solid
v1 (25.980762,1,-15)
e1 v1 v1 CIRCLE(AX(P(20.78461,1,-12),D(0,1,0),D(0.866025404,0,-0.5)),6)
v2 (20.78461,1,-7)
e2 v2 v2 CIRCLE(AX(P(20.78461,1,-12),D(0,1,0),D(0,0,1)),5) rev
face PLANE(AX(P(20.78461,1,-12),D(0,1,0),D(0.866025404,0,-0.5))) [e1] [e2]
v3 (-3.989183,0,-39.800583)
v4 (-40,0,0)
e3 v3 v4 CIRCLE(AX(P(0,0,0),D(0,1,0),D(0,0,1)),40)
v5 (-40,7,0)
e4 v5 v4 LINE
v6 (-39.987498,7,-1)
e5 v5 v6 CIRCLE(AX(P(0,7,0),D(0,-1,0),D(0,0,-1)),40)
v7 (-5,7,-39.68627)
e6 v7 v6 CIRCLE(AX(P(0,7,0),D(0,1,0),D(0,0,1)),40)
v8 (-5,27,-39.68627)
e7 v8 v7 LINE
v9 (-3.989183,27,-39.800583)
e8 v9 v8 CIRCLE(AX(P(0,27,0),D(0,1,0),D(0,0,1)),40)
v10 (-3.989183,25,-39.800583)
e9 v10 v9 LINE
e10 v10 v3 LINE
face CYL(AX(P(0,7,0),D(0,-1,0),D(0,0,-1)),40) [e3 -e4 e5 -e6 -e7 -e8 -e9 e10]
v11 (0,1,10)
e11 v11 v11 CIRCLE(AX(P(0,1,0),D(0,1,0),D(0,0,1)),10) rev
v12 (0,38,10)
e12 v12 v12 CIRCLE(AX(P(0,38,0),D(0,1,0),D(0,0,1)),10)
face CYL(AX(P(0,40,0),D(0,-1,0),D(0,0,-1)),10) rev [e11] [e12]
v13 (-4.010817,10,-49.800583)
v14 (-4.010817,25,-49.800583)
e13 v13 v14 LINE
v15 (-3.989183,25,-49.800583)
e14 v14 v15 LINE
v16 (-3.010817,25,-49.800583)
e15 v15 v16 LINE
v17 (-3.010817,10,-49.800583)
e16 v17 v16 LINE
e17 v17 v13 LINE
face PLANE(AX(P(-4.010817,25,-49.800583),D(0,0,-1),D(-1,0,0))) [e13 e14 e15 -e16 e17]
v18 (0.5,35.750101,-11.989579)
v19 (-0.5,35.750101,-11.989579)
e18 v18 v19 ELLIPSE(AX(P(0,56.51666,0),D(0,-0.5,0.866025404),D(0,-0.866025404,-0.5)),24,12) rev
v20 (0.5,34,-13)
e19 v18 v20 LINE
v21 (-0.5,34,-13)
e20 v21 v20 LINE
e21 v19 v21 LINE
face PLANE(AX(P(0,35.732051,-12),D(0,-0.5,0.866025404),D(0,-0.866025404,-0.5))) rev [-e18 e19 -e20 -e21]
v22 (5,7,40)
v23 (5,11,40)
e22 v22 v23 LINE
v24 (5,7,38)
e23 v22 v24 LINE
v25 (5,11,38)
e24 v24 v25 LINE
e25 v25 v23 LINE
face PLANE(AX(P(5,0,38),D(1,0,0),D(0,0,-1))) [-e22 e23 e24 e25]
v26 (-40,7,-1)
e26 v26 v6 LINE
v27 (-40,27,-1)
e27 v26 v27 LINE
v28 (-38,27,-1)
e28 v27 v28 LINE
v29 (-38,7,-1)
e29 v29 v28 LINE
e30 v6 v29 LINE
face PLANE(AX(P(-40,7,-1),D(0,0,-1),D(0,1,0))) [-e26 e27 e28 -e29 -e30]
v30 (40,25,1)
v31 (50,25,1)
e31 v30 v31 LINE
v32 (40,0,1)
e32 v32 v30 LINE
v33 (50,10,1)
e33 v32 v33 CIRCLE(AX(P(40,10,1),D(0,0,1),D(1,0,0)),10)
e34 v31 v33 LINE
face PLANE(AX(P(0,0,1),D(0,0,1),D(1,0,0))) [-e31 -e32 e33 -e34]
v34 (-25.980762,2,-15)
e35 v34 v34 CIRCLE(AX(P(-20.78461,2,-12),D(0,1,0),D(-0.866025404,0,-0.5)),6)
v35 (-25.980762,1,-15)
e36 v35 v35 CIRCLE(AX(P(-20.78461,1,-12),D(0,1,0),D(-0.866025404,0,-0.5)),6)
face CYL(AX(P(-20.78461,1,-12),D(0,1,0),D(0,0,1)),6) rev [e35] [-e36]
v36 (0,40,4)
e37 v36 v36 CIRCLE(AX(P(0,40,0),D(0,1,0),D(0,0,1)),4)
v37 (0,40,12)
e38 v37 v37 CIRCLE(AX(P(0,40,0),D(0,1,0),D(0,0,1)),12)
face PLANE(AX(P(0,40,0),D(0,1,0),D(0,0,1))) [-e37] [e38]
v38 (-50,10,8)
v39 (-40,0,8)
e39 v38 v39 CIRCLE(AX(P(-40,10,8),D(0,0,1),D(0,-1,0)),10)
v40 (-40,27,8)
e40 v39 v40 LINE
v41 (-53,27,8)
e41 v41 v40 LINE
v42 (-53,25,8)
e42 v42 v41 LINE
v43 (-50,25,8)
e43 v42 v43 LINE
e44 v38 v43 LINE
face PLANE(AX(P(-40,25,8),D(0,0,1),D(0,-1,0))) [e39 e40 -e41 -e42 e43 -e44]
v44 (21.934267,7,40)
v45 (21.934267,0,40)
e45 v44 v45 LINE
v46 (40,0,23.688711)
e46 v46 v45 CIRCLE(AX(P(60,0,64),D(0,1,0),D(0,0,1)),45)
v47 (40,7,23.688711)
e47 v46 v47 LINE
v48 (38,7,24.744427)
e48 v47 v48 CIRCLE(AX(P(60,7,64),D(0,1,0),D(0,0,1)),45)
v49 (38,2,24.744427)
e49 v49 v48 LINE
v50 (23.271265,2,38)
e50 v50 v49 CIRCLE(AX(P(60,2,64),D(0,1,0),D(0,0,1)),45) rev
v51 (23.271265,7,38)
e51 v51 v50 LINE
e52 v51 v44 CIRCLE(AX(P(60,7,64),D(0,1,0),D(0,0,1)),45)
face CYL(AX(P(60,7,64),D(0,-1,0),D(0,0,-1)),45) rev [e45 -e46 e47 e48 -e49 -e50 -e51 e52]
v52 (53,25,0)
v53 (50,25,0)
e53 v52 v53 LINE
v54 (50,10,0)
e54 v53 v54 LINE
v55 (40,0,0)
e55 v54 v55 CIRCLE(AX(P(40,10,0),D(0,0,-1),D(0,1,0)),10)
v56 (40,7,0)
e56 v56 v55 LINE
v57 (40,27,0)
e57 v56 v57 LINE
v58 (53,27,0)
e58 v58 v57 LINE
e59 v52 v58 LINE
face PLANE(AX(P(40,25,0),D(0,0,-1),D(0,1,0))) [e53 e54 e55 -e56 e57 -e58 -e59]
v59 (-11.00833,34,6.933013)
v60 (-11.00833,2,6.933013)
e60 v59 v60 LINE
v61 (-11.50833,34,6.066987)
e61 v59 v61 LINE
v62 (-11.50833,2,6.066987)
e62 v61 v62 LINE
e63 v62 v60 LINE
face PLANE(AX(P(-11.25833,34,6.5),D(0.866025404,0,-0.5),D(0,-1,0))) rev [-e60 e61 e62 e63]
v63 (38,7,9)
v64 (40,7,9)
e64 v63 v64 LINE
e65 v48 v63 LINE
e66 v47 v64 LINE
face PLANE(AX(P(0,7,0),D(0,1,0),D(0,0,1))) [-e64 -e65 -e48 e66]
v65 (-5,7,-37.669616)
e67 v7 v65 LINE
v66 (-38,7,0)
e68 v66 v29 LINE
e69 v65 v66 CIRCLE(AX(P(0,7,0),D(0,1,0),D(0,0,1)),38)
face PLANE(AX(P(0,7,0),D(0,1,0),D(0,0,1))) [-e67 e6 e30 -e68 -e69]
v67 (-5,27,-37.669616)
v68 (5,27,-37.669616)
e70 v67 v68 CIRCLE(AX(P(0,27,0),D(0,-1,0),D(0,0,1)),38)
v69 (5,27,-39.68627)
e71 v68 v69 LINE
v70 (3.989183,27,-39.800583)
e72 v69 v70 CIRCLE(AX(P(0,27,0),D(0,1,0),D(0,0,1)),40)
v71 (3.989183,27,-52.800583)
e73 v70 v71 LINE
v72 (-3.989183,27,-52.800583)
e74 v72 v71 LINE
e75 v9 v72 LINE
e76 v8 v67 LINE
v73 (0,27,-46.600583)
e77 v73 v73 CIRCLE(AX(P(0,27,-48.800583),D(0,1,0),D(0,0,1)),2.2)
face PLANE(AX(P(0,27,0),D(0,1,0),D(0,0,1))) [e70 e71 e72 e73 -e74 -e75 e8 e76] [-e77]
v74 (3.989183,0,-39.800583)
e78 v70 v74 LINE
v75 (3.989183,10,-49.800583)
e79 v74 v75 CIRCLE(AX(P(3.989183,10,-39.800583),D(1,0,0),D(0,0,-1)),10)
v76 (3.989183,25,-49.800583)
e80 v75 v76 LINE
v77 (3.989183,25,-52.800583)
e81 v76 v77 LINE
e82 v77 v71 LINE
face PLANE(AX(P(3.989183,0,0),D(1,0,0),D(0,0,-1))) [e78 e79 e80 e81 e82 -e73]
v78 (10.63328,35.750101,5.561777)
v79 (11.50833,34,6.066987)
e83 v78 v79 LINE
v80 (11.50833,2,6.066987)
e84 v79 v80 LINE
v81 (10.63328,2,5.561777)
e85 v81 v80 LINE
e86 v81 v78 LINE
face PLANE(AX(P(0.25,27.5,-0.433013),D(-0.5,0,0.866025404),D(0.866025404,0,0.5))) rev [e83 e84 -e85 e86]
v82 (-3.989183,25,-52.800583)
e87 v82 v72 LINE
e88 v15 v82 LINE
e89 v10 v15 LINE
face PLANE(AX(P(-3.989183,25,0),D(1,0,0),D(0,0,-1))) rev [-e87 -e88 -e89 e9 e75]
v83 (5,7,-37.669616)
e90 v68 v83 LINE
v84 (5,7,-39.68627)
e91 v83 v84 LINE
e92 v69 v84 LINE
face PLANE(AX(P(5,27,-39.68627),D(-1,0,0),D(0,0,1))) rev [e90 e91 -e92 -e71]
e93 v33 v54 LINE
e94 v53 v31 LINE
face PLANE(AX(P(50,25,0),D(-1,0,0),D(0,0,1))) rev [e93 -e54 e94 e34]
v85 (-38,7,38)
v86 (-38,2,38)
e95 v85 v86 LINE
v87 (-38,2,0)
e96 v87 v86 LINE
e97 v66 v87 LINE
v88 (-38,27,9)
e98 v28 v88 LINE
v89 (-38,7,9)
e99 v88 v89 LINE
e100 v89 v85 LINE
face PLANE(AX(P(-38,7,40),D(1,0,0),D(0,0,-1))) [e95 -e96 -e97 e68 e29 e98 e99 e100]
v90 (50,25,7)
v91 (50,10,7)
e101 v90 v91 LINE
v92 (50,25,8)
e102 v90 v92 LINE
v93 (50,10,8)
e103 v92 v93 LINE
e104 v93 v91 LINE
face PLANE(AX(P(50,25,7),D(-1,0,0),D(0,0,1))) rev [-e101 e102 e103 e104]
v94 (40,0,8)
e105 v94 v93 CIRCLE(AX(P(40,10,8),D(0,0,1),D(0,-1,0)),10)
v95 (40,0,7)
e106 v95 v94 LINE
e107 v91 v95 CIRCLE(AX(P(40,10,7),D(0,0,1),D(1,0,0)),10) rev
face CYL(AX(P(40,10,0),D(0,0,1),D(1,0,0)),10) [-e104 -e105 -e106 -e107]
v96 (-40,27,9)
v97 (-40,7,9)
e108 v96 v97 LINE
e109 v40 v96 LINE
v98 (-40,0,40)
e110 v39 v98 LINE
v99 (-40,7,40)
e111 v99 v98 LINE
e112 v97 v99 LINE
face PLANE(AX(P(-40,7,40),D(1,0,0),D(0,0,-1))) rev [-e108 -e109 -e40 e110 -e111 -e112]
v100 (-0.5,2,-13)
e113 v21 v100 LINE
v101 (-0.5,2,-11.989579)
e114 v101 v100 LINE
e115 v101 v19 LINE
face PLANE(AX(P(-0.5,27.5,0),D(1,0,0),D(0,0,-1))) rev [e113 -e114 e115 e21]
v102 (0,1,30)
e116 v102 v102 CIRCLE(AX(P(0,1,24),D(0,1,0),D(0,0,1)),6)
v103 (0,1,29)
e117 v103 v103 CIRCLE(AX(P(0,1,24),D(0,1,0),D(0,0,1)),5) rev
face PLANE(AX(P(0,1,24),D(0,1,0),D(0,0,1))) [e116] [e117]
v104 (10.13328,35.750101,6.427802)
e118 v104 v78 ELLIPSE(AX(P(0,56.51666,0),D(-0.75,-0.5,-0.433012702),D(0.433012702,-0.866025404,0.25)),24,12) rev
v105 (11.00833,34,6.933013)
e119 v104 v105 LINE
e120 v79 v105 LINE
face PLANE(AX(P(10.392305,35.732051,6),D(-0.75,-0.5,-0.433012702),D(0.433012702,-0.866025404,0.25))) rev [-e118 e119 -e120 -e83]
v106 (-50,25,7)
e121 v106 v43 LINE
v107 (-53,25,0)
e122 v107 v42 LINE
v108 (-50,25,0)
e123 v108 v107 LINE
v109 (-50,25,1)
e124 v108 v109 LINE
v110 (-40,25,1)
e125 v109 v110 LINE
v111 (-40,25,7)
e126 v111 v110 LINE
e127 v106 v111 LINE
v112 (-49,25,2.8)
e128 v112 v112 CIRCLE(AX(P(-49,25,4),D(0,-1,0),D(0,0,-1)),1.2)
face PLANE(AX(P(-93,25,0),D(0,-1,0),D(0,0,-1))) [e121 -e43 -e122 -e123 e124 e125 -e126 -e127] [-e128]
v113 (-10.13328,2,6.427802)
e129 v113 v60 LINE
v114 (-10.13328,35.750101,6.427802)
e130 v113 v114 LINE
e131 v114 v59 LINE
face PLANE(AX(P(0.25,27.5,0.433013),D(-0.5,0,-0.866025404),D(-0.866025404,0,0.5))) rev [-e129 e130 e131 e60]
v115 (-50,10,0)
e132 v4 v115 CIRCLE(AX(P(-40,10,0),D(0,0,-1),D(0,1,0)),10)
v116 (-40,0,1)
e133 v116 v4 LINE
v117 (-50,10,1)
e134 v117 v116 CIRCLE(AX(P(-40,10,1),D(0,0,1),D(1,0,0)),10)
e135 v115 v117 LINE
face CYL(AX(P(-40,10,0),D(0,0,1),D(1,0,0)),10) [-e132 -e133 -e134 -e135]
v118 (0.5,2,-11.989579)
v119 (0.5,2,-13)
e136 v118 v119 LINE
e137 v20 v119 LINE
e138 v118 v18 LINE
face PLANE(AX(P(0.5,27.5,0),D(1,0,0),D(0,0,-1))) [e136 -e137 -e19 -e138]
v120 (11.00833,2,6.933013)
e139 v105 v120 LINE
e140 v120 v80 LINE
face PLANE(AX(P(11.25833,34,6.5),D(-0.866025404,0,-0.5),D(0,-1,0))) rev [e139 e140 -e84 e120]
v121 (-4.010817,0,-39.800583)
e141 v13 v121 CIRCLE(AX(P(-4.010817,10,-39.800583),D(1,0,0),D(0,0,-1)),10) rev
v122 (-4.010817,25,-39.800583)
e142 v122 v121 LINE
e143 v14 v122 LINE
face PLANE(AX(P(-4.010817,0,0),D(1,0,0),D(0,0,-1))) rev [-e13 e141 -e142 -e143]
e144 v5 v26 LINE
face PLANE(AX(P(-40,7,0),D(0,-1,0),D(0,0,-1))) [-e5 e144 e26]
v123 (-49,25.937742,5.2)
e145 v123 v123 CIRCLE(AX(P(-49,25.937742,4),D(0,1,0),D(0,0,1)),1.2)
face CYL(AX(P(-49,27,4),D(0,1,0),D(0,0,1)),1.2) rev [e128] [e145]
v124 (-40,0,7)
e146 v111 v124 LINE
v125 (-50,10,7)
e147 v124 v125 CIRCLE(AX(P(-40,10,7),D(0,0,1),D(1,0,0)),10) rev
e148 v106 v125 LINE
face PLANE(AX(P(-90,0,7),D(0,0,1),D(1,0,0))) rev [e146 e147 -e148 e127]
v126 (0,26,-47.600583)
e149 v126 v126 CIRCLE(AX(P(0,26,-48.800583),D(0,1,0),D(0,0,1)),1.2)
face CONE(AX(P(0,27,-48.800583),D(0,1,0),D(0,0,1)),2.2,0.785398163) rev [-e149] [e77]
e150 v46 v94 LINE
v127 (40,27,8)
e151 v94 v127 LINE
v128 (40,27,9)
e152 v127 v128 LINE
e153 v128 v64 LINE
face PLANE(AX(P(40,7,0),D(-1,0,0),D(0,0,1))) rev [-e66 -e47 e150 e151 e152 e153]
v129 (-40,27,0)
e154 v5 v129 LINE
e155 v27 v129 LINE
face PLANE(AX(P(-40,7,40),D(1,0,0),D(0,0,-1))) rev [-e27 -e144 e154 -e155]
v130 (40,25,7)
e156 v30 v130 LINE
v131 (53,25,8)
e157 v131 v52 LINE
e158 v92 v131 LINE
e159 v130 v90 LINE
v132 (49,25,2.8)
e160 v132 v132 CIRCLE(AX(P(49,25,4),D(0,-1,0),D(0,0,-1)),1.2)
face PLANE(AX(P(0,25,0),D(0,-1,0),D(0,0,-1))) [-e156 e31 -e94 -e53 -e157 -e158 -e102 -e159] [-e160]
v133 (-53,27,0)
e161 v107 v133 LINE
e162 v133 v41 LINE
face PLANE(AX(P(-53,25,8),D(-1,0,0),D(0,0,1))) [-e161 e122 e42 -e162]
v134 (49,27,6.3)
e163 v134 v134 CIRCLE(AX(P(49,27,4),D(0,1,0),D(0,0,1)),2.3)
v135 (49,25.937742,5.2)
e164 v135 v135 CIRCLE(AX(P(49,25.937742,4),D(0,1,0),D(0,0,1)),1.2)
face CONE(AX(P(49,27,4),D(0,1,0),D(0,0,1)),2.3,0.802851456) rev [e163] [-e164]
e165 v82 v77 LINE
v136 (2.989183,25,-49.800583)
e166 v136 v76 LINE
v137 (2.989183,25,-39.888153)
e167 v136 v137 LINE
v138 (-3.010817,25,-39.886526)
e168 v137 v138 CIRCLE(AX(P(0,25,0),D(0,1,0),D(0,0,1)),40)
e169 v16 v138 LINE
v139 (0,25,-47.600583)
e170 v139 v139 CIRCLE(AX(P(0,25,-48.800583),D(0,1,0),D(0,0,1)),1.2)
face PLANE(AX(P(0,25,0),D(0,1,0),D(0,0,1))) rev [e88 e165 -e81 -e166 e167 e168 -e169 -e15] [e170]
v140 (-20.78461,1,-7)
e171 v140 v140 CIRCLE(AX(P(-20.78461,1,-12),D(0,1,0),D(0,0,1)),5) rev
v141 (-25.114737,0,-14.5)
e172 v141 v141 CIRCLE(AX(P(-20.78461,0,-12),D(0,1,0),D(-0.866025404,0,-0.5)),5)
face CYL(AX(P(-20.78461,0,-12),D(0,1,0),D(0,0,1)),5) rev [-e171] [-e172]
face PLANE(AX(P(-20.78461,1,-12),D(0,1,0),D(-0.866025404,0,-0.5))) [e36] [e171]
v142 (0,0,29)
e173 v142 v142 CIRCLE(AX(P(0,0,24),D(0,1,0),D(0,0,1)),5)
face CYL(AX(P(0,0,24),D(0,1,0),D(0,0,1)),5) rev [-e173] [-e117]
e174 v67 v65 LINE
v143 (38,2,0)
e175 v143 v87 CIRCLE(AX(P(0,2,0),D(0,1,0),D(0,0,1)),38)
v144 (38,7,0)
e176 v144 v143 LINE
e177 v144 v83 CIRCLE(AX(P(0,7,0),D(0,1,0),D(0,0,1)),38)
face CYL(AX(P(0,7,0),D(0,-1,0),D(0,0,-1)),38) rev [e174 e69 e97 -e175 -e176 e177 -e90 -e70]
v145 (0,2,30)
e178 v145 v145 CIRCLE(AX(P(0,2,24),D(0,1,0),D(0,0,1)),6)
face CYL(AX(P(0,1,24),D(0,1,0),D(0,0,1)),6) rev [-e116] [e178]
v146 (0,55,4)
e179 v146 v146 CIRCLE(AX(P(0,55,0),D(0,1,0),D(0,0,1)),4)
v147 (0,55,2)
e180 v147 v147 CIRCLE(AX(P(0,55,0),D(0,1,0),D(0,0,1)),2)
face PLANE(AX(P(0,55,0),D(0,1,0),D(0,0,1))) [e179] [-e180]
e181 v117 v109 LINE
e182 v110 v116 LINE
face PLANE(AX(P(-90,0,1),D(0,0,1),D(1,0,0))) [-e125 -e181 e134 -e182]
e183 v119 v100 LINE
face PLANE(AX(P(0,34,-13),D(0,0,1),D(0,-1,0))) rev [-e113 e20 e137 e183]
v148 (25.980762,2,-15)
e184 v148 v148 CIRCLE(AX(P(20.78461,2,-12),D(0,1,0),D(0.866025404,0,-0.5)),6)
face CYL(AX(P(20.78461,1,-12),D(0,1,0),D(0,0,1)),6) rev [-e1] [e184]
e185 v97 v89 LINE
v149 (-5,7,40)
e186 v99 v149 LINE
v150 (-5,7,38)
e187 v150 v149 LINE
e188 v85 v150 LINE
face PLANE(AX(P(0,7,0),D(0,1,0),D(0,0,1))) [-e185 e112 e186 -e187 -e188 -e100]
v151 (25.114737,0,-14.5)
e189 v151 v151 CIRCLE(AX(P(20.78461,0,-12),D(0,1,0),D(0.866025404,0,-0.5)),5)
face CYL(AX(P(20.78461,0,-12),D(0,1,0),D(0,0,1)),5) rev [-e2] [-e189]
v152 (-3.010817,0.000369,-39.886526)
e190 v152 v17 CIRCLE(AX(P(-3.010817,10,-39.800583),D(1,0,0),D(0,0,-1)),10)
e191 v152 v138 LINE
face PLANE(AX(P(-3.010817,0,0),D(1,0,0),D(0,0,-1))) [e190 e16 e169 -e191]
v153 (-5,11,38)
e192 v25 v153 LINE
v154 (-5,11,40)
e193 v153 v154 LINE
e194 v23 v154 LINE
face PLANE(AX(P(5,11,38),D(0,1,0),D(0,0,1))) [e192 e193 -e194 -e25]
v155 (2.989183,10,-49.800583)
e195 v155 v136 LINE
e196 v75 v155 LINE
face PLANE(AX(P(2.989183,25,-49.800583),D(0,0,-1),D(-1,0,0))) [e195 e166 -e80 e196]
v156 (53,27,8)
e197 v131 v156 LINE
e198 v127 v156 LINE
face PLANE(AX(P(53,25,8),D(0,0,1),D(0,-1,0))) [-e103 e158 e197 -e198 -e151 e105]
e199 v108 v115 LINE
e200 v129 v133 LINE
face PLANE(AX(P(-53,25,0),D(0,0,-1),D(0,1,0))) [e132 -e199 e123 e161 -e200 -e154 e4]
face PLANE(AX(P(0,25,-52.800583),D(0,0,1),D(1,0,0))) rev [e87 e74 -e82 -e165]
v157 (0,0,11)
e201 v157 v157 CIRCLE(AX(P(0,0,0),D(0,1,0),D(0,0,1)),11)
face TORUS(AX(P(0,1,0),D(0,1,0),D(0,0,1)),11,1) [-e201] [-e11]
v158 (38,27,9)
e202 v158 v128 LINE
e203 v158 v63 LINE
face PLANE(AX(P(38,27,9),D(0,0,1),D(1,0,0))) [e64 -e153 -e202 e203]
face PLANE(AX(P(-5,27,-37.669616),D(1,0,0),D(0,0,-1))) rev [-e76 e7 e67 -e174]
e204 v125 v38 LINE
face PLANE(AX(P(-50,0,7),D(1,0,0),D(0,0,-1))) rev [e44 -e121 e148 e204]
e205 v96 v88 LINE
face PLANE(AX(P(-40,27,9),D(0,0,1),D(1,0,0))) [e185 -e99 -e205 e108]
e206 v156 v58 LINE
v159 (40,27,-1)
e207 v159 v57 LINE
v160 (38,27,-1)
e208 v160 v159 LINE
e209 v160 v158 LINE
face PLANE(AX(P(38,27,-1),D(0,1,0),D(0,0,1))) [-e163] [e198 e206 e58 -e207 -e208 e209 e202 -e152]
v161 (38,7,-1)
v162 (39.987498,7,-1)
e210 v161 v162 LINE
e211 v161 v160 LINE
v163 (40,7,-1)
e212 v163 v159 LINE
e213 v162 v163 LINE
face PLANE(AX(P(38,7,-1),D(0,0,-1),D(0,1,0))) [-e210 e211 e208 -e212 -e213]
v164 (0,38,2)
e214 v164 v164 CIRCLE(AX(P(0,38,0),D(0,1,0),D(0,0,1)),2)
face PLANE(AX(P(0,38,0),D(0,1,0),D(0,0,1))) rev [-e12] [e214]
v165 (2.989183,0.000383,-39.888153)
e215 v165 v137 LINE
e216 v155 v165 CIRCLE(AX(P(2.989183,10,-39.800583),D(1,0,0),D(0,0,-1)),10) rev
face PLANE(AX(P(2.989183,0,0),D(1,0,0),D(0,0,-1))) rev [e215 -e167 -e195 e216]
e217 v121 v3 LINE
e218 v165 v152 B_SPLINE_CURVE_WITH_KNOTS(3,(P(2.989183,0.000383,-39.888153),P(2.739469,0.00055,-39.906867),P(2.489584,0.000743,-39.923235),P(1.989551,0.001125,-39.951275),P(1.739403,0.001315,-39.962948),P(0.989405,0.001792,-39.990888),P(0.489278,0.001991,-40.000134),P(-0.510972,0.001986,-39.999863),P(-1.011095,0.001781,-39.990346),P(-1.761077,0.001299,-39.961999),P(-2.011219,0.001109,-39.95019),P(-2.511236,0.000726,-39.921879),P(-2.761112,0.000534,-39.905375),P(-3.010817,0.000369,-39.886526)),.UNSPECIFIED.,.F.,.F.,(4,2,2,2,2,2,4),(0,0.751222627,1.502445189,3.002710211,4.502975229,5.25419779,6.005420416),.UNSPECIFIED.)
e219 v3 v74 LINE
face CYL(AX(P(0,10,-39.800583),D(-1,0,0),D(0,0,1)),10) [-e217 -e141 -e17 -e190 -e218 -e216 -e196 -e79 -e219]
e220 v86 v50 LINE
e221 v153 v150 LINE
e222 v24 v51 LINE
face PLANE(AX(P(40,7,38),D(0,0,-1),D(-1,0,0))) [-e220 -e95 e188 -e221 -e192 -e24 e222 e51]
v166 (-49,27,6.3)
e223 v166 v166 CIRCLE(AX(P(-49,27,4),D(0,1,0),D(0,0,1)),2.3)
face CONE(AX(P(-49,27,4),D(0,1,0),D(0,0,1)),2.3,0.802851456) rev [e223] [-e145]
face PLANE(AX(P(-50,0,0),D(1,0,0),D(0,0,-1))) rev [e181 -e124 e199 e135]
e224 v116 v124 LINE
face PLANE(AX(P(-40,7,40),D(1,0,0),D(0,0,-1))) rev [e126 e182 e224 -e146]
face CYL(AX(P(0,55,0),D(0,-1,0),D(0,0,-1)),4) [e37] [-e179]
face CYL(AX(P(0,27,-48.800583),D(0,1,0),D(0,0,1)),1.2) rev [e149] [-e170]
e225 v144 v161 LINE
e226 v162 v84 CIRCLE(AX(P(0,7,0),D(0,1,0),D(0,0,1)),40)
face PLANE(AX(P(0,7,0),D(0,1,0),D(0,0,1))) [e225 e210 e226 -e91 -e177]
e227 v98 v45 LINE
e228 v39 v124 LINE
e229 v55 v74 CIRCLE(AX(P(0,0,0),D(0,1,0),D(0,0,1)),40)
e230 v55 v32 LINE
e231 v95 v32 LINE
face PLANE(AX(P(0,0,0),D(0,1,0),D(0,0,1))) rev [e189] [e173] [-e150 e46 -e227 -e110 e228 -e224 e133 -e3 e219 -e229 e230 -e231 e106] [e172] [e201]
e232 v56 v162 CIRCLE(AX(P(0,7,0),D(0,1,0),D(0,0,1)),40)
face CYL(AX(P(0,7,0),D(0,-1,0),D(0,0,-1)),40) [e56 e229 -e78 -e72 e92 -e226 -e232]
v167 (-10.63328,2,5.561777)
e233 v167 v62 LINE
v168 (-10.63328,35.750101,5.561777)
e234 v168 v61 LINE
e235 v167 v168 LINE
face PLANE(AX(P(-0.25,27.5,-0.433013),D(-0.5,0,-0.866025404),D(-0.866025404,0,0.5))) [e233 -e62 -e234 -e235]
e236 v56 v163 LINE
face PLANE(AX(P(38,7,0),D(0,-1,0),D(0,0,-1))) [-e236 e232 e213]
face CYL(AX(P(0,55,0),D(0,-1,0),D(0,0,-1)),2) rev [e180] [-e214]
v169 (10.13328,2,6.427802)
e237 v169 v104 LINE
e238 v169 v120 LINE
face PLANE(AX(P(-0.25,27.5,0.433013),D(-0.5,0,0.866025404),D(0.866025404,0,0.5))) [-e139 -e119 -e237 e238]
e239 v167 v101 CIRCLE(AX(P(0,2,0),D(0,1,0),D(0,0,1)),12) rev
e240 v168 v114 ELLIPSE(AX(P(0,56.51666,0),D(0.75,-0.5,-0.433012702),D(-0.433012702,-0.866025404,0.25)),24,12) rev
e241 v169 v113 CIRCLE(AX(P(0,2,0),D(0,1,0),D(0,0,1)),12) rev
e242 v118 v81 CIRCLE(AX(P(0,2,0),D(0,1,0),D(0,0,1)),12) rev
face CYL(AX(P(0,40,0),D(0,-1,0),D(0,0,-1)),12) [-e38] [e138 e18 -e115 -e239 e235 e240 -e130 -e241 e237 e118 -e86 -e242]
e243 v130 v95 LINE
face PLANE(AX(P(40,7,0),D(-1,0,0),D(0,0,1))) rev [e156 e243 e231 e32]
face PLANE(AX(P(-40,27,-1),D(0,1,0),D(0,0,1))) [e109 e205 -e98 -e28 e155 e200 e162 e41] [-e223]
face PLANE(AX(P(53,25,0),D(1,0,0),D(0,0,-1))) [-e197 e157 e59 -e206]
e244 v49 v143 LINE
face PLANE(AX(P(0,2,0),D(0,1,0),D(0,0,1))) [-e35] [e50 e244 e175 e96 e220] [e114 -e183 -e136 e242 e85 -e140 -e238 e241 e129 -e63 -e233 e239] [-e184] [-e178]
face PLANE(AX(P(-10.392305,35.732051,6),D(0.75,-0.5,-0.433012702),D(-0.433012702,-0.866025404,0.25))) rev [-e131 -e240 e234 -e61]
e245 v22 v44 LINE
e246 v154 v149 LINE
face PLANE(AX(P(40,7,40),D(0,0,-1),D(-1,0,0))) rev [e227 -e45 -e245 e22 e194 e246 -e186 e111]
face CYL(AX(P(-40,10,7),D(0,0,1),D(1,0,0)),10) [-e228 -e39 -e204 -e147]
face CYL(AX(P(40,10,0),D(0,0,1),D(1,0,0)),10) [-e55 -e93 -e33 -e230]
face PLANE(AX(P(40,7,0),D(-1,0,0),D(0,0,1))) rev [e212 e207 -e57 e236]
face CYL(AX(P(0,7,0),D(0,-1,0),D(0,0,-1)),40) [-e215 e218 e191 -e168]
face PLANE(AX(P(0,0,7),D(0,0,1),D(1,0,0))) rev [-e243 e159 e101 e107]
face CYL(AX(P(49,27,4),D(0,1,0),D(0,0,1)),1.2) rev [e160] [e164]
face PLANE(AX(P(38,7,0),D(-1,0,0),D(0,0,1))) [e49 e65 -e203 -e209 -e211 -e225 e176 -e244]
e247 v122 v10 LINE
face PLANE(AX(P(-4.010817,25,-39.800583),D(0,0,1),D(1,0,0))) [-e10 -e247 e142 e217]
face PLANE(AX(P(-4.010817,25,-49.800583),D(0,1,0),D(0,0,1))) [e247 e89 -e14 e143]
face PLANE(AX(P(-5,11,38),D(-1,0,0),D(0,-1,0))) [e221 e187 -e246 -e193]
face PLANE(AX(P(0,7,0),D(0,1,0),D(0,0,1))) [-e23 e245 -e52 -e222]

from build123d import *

# Parameters (mm, degrees)
BOSS_EXTRUDE2_DEPTH                                 = 7
SHELL3_T                                            = -2
SKETCH2_R                                           = 12
BOSS_EXTRUDE3_DEPTH                                 = 40
SKETCH3_R                                           = 4
BOSS_EXTRUDE4_DEPTH                                 = 15
SHELL4_START                                        = 2
SHELL4_OUTLINE_R                                    = 10
SHELL4_DEPTH                                        = 36
SHELL4_START_2                                      = 38
SHELL4_2_OUTLINE_R                                  = 2
SHELL4_2_DEPTH                                      = 17
RIB1_START                                          = -0.5
RIB1_DEPTH                                          = 1
CIRPATTERN1_COUNT                                   = 3
BOSS_EXTRUDE5_DEPTH                                 = 2
SKETCH29_R                                          = 44.999999999999986
CUT_EXTRUDE14_DEPTH                                 = 7
BOSS_EXTRUDE9_DEPTH                                 = 2
SKETCH32_R                                          = 10
CUT_EXTRUDE10_DEPTH                                 = 2
FILLET3_R                                           = 1
SKETCH35_R                                          = 5.000000000000003
CUT_EXTRUDE12_DEPTH                                 = 2
CIRPATTERN2_COUNT                                   = 3
SKETCH37_R                                          = 6.000000000000001
CUT_EXTRUDE13_DEPTH                                 = 1
CIRPATTERN3_COUNT                                   = 3
BOSS_EXTRUDE13_DEPTH                                = 20
BOSS_EXTRUDE14_DEPTH                                = 2
BOSS_EXTRUDE15_DEPTH                                = 1
LPATTERN4_COUNT                                     = 2
LPATTERN4_PITCH                                     = 7
FILLET4_R                                           = 10
CSK_FOR_M2_COUNTERSUNK_FLAT_HEAD_SCREW6_D           = 2.4
CSK_FOR_M2_COUNTERSUNK_FLAT_HEAD_SCREW6_CSINK_D     = 4.4
CSK_FOR_M2_COUNTERSUNK_FLAT_HEAD_SCREW6_CSINK_ANGLE = 90
BOSS_EXTRUDE16_DEPTH                                = 2
SKETCH68_W                                          = 10
SKETCH68_H                                          = 25.000000000000004
EXTRUDE_THIN1_DEPTH                                 = 1
LPATTERN5_COUNT                                     = 2
LPATTERN5_PITCH                                     = 7
LPATTERN6_COUNT                                     = 2
LPATTERN6_PITCH                                     = 78
LPATTERN7_COUNT                                     = 2
LPATTERN7_PITCH                                     = 93
LPATTERN8_COUNT                                     = 2
LPATTERN8_PITCH                                     = 90
LPATTERN8_COPY_1_SKETCH_W                           = 10
LPATTERN8_COPY_1_SKETCH_H                           = 25.000000000000004
LPATTERN8_COPY_1_DEPTH                              = 1
FILLET5_R                                           = 10
CSK_FOR_M2_FLAT_CROSS_HEAD_SCREW1_D                 = 2.4
CSK_FOR_M2_FLAT_CROSS_HEAD_SCREW1_CSINK_D           = 4.6
CSK_FOR_M2_FLAT_CROSS_HEAD_SCREW1_CSINK_ANGLE       = 92


# Read off the part's stored shape, not the designer's step: Shell4, Rib1
with BuildPart() as part:
    # Sketch1 → Boss-Extrude2 (new body)
    with BuildSketch(Plane(origin=(0, 0, 0), x_dir=(1, 0, 0), z_dir=(0, 1, 0))):
        with BuildLine():
            Line((40, 4.9e-15), (40.00000000000001, -40.00000000000001))
            Line((40.00000000000001, -40.00000000000001), (-40.00000000000001, -40.00000000000001))
            Line((-40.00000000000001, -40.00000000000001), (-40, 4.9e-15))
            ThreePointArc((-40, 4.9e-15), (-6.43e-15, 40), (40, 4.9e-15))
        make_face()
    extrude(amount=BOSS_EXTRUDE2_DEPTH)

    # Shell3
    shell3_openings = [part.faces().sort_by_distance(p)[0] for p in [
        (0, 7, 3.733994357),
    ]]
    offset(amount=SHELL3_T, openings=shell3_openings, kind=Kind.INTERSECTION)

    # Sketch2 → Boss-Extrude3 (add)
    with BuildSketch(Plane(origin=(0, 0, 0), x_dir=(1, 0, 0), z_dir=(0, 1, 0))):
        with Locations(Location((0, 0, 0), (0, 0, 270))):
            Circle(SKETCH2_R)
    extrude(amount=BOSS_EXTRUDE3_DEPTH)

    # Sketch3 → Boss-Extrude4 (add)
    with BuildSketch(Plane(origin=(0, 40, 0), x_dir=(1, 0, 0), z_dir=(0, 1, 0))):
        with Locations(Location((0, 0, 0), (0, 0, 270))):
            Circle(SKETCH3_R)
    extrude(amount=BOSS_EXTRUDE4_DEPTH)

    # Shell4 outline → Shell4 (cut)
    with BuildSketch(Plane(origin=(0, 0, 0), x_dir=(1, 0, 0), z_dir=(0, 1, 0)).offset(SHELL4_START)):
        Circle(SHELL4_OUTLINE_R)
    extrude(amount=SHELL4_DEPTH, mode=Mode.SUBTRACT)

    # Shell4 2 outline → Shell4 2 (cut)
    with BuildSketch(Plane(origin=(0, 0, 0), x_dir=(1, 0, 0), z_dir=(0, 1, 0)).offset(SHELL4_START_2)):
        Circle(SHELL4_2_OUTLINE_R)
    extrude(amount=SHELL4_2_DEPTH, mode=Mode.SUBTRACT)

    # Rib1 outline → Rib1 (add)
    with BuildSketch(Plane(origin=(0, 0, 0), x_dir=(0, 0, -1), z_dir=(1, 0, 0)).offset(RIB1_START)):
        Polygon((13, 34), (11.989578808, 35.750100841), (11.267949192, 37), (10, 37), (10, 1), (13, 1), align=None)
    rib1 = extrude(amount=RIB1_DEPTH)

    # CirPattern1: Rib1 ×3 about axis
    cirpattern1_axis = Axis((-5e-17, 0, 1.3e-15), (0, 1, 0))
    for i in range(1, CIRPATTERN1_COUNT):
        add(rib1.rotate(cirpattern1_axis, i * 360 / CIRPATTERN1_COUNT))

    # Sketch13 → Boss-Extrude5 (add)
    with BuildSketch(Plane(origin=(40, 0, -6.94e-15), x_dir=(0, 0, -1), z_dir=(1, 0, 0))):
        Polygon((0.9999999999999784, 7.0000000000000036), (0.9999999999999662, 27.000000000000004), (-9.000000000000014, 27), (-9.000000000000014, 7), (-40.000000000000014, 7), (-40.000000000000014, 0), (0, 0), (0, 7), align=None)
    boss_extrude5 = extrude(amount=-BOSS_EXTRUDE5_DEPTH)

    # Sketch29 → Cut-Extrude14 (cut)
    with BuildSketch(Plane(origin=(0, 0, 0), x_dir=(1, 0, 0), z_dir=(0, 1, 0))):
        with Locations((60.00000000000001, -64)):
            Circle(SKETCH29_R)
    extrude(amount=CUT_EXTRUDE14_DEPTH, mode=Mode.SUBTRACT)

    # Sketch31 → Boss-Extrude9 (add)
    with BuildSketch(Plane.XY.offset(40.00000000000001)):
        Polygon((5, 0), (5, 11), (-5.0000000000000036, 11), (-5, 0), align=None)
    extrude(amount=-BOSS_EXTRUDE9_DEPTH)

    # Sketch32 → Cut-Extrude10 (cut)
    with BuildSketch(Plane(origin=(0, 0, 0), x_dir=(1, 0, 0), z_dir=(0, 1, 0))):
        with Locations(Location((0, 0, 0), (0, 0, 270))):
            Circle(SKETCH32_R)
    extrude(amount=CUT_EXTRUDE10_DEPTH, mode=Mode.SUBTRACT)

    # Fillet3
    fillet3_edges = [part.edges().sort_by_distance(p)[0] for p in [
        (3.06e-15, 0, -10),
    ]]
    fillet(fillet3_edges, radius=FILLET3_R)

    # Sketch35 → Cut-Extrude12 (cut)
    with BuildSketch(Plane(origin=(0, 2, 0), x_dir=(1, 0, 0), z_dir=(0, 1, 0))):
        with Locations(Location((0, -24, 0), (0, 0, 270))):
            Circle(SKETCH35_R)
    cut_extrude12 = extrude(amount=-CUT_EXTRUDE12_DEPTH, mode=Mode.SUBTRACT)

    # CirPattern2: Cut-Extrude12 ×3 about axis
    cirpattern2_axis = Axis((-3.7e-16, 0, -1.37e-15), (0, 1, 0))
    for i in range(1, CIRPATTERN2_COUNT):
        add(cut_extrude12.rotate(cirpattern2_axis, i * 360 / CIRPATTERN2_COUNT), mode=Mode.SUBTRACT)

    # Sketch37 → Cut-Extrude13 (cut)
    with BuildSketch(Plane(origin=(0, 2, 0), x_dir=(1, 0, 0), z_dir=(0, 1, 0))):
        with Locations(Location((0, -24, 0), (0, 0, 270))):
            Circle(SKETCH37_R)
    cut_extrude13 = extrude(amount=-CUT_EXTRUDE13_DEPTH, mode=Mode.SUBTRACT)

    # CirPattern3: Cut-Extrude13 ×3 about axis
    cirpattern3_axis = Axis((3.7e-16, 0, -1.37e-15), (0, 1, 0))
    for i in range(1, CIRPATTERN3_COUNT):
        add(cut_extrude13.rotate(cirpattern3_axis, i * 360 / CIRPATTERN3_COUNT), mode=Mode.SUBTRACT)

    # Sketch61 → Boss-Extrude13 (add)
    with BuildSketch(Plane(origin=(0, 7, 0), x_dir=(1, 0, 0), z_dir=(0, 1, 0))):
        with BuildLine():
            Line((5, 39.68626966596886), (5.000000000000001, 37.66961640367472))
            ThreePointArc((5.000000000000001, 37.66961640367472), (2.33e-15, 38), (-5, 37.66961640367472))
            Line((-5, 37.66961640367472), (-5, 39.68626966596886))
            ThreePointArc((-5, 39.68626966596886), (2.45e-15, 40), (5, 39.68626966596886))
        make_face()
    extrude(amount=BOSS_EXTRUDE13_DEPTH)



with BuildPart() as body_2:
    # Sketch62 → Boss-Extrude14 (new body)
    with BuildSketch(Plane(origin=(0, 27, 0), x_dir=(1, 0, 0), z_dir=(0, 1, 0))):
        with BuildLine():
            Line((-3.9891832676658594, 52.80058312207215), (-3.9891832676658594, 39.800583122072155))
            ThreePointArc((-3.9891832676658567, 39.800583122072155), (2.45e-15, 40), (3.9891832676658616, 39.800583122072155))
            Line((3.9891832676658594, 39.800583122072155), (3.9891832676658594, 52.80058312207215))
            Line((3.9891832676658594, 52.80058312207215), (-3.9891832676658594, 52.80058312207215))
        make_face()
    extrude(amount=-BOSS_EXTRUDE14_DEPTH)


with BuildPart() as part_1:
    add(part.part)

    add(body_2.part)  # Boss-Extrude15 merges body 2
    # Sketch63 → Boss-Extrude15 (add)
    with BuildSketch(Plane(origin=(3.9891832676658594, 0, 0), x_dir=(0, 0, -1), z_dir=(1, 0, 0))):
        Polygon((49.800583122072155, 25), (49.800583122072155, 9.75e-15), (40, 0), (39.80058312207216, 0), (39.80058312207216, 25), align=None)
    boss_extrude15 = extrude(amount=-BOSS_EXTRUDE15_DEPTH)

    # LPattern4: Boss-Extrude15 ×2
    with Locations(*[(-i * LPATTERN4_PITCH, 0, 0) for i in range(1, LPATTERN4_COUNT)]):
        add(boss_extrude15)

    # Fillet4
    fillet4_edges = [part_1.edges().sort_by_distance(p)[0] for p in [
        (-3.5108167323341406, 9.75e-15, -49.800583122072155),
    ]]
    fillet(fillet4_edges, radius=FILLET4_R)

    # CSK for M2 Countersunk Flat Head Screw6 (through all)
    with Locations(Plane(origin=(0, 27, 0), x_dir=(1, 0, 0), z_dir=(0, 1, 0))):
        with Locations((0, 48.800583122)):
            CounterSinkHole(CSK_FOR_M2_COUNTERSUNK_FLAT_HEAD_SCREW6_D / 2, CSK_FOR_M2_COUNTERSUNK_FLAT_HEAD_SCREW6_CSINK_D / 2, counter_sink_angle=CSK_FOR_M2_COUNTERSUNK_FLAT_HEAD_SCREW6_CSINK_ANGLE)

    # Sketch67 → Boss-Extrude16 (add)
    with BuildSketch(Plane(origin=(0, 27.000000000000004, 9.37e-15), x_dir=(1, 0, 0), z_dir=(0, 1, 3.5e-16))):
        Polygon((40, -8.67e-15), (53, -8.67e-15), (53, -4.000000000000009), (53, -8.000000000000009), (40, -8.000000000000009), align=None)
    boss_extrude16 = extrude(amount=-BOSS_EXTRUDE16_DEPTH)

    # Sketch68 → Extrude-Thin1 (add)
    with BuildSketch(Plane.XY.offset(8.000000000000009)):
        with Locations((45.00000000000001, 12.500000000000002)):
            Rectangle(SKETCH68_W, SKETCH68_H)
    extrude_thin1 = extrude(amount=-EXTRUDE_THIN1_DEPTH)

    # LPattern5: Extrude-Thin1 ×2
    with Locations(*[(0, 0, -i * LPATTERN5_PITCH) for i in range(1, LPATTERN5_COUNT)]):
        add(extrude_thin1)

    # LPattern6: Boss-Extrude5 ×2
    with Locations(*[(-i * LPATTERN6_PITCH, 0, 0) for i in range(1, LPATTERN6_COUNT)]):
        add(boss_extrude5)

    # LPattern7: Boss-Extrude16 ×2
    with Locations(*[(-i * LPATTERN7_PITCH, 0, 0) for i in range(1, LPATTERN7_COUNT)]):
        add(boss_extrude16)

    # LPattern8: Extrude-Thin1 ×2
    with Locations(*[(-i * LPATTERN8_PITCH, 0, 0) for i in range(1, LPATTERN8_COUNT)]):
        add(extrude_thin1)

    # LPattern8 copy 1 sketch → LPattern8 copy 1 (add)
    with BuildSketch(Plane(origin=(-90, -2.78e-15, 0.9999999999999929), x_dir=(1, 0, 0), z_dir=(0, 0, 1))):
        with Locations((45.00000000000001, 12.500000000000002)):
            Rectangle(LPATTERN8_COPY_1_SKETCH_W, LPATTERN8_COPY_1_SKETCH_H)
    extrude(amount=-LPATTERN8_COPY_1_DEPTH)

    # Fillet5
    fillet5_edges = [part_1.edges().sort_by_distance(p)[0] for p in [
        (-49.99999999999999, -2.8e-15, 7.499999999999993),
        (-49.99999999999999, -2.8e-15, 0.4999999999999929),
        (50.00000000000001, -2.8e-15, 7.500000000000009),
        (50.00000000000001, -2.8e-15, 0.5000000000000089),
    ]]
    fillet(fillet5_edges, radius=FILLET5_R)

    # CSK for M2 Flat Cross Head Screw1 (through all)
    with Locations(Plane(origin=(0, 27.000000000000004, 9.37e-15), x_dir=(1, 0, 0), z_dir=(0, 1, 3.5e-16))):
        with Locations((49, -4), (-49, -4)):
            CounterSinkHole(CSK_FOR_M2_FLAT_CROSS_HEAD_SCREW1_D / 2, CSK_FOR_M2_FLAT_CROSS_HEAD_SCREW1_CSINK_D / 2, counter_sink_angle=CSK_FOR_M2_FLAT_CROSS_HEAD_SCREW1_CSINK_ANGLE)


solid = part_1.part
